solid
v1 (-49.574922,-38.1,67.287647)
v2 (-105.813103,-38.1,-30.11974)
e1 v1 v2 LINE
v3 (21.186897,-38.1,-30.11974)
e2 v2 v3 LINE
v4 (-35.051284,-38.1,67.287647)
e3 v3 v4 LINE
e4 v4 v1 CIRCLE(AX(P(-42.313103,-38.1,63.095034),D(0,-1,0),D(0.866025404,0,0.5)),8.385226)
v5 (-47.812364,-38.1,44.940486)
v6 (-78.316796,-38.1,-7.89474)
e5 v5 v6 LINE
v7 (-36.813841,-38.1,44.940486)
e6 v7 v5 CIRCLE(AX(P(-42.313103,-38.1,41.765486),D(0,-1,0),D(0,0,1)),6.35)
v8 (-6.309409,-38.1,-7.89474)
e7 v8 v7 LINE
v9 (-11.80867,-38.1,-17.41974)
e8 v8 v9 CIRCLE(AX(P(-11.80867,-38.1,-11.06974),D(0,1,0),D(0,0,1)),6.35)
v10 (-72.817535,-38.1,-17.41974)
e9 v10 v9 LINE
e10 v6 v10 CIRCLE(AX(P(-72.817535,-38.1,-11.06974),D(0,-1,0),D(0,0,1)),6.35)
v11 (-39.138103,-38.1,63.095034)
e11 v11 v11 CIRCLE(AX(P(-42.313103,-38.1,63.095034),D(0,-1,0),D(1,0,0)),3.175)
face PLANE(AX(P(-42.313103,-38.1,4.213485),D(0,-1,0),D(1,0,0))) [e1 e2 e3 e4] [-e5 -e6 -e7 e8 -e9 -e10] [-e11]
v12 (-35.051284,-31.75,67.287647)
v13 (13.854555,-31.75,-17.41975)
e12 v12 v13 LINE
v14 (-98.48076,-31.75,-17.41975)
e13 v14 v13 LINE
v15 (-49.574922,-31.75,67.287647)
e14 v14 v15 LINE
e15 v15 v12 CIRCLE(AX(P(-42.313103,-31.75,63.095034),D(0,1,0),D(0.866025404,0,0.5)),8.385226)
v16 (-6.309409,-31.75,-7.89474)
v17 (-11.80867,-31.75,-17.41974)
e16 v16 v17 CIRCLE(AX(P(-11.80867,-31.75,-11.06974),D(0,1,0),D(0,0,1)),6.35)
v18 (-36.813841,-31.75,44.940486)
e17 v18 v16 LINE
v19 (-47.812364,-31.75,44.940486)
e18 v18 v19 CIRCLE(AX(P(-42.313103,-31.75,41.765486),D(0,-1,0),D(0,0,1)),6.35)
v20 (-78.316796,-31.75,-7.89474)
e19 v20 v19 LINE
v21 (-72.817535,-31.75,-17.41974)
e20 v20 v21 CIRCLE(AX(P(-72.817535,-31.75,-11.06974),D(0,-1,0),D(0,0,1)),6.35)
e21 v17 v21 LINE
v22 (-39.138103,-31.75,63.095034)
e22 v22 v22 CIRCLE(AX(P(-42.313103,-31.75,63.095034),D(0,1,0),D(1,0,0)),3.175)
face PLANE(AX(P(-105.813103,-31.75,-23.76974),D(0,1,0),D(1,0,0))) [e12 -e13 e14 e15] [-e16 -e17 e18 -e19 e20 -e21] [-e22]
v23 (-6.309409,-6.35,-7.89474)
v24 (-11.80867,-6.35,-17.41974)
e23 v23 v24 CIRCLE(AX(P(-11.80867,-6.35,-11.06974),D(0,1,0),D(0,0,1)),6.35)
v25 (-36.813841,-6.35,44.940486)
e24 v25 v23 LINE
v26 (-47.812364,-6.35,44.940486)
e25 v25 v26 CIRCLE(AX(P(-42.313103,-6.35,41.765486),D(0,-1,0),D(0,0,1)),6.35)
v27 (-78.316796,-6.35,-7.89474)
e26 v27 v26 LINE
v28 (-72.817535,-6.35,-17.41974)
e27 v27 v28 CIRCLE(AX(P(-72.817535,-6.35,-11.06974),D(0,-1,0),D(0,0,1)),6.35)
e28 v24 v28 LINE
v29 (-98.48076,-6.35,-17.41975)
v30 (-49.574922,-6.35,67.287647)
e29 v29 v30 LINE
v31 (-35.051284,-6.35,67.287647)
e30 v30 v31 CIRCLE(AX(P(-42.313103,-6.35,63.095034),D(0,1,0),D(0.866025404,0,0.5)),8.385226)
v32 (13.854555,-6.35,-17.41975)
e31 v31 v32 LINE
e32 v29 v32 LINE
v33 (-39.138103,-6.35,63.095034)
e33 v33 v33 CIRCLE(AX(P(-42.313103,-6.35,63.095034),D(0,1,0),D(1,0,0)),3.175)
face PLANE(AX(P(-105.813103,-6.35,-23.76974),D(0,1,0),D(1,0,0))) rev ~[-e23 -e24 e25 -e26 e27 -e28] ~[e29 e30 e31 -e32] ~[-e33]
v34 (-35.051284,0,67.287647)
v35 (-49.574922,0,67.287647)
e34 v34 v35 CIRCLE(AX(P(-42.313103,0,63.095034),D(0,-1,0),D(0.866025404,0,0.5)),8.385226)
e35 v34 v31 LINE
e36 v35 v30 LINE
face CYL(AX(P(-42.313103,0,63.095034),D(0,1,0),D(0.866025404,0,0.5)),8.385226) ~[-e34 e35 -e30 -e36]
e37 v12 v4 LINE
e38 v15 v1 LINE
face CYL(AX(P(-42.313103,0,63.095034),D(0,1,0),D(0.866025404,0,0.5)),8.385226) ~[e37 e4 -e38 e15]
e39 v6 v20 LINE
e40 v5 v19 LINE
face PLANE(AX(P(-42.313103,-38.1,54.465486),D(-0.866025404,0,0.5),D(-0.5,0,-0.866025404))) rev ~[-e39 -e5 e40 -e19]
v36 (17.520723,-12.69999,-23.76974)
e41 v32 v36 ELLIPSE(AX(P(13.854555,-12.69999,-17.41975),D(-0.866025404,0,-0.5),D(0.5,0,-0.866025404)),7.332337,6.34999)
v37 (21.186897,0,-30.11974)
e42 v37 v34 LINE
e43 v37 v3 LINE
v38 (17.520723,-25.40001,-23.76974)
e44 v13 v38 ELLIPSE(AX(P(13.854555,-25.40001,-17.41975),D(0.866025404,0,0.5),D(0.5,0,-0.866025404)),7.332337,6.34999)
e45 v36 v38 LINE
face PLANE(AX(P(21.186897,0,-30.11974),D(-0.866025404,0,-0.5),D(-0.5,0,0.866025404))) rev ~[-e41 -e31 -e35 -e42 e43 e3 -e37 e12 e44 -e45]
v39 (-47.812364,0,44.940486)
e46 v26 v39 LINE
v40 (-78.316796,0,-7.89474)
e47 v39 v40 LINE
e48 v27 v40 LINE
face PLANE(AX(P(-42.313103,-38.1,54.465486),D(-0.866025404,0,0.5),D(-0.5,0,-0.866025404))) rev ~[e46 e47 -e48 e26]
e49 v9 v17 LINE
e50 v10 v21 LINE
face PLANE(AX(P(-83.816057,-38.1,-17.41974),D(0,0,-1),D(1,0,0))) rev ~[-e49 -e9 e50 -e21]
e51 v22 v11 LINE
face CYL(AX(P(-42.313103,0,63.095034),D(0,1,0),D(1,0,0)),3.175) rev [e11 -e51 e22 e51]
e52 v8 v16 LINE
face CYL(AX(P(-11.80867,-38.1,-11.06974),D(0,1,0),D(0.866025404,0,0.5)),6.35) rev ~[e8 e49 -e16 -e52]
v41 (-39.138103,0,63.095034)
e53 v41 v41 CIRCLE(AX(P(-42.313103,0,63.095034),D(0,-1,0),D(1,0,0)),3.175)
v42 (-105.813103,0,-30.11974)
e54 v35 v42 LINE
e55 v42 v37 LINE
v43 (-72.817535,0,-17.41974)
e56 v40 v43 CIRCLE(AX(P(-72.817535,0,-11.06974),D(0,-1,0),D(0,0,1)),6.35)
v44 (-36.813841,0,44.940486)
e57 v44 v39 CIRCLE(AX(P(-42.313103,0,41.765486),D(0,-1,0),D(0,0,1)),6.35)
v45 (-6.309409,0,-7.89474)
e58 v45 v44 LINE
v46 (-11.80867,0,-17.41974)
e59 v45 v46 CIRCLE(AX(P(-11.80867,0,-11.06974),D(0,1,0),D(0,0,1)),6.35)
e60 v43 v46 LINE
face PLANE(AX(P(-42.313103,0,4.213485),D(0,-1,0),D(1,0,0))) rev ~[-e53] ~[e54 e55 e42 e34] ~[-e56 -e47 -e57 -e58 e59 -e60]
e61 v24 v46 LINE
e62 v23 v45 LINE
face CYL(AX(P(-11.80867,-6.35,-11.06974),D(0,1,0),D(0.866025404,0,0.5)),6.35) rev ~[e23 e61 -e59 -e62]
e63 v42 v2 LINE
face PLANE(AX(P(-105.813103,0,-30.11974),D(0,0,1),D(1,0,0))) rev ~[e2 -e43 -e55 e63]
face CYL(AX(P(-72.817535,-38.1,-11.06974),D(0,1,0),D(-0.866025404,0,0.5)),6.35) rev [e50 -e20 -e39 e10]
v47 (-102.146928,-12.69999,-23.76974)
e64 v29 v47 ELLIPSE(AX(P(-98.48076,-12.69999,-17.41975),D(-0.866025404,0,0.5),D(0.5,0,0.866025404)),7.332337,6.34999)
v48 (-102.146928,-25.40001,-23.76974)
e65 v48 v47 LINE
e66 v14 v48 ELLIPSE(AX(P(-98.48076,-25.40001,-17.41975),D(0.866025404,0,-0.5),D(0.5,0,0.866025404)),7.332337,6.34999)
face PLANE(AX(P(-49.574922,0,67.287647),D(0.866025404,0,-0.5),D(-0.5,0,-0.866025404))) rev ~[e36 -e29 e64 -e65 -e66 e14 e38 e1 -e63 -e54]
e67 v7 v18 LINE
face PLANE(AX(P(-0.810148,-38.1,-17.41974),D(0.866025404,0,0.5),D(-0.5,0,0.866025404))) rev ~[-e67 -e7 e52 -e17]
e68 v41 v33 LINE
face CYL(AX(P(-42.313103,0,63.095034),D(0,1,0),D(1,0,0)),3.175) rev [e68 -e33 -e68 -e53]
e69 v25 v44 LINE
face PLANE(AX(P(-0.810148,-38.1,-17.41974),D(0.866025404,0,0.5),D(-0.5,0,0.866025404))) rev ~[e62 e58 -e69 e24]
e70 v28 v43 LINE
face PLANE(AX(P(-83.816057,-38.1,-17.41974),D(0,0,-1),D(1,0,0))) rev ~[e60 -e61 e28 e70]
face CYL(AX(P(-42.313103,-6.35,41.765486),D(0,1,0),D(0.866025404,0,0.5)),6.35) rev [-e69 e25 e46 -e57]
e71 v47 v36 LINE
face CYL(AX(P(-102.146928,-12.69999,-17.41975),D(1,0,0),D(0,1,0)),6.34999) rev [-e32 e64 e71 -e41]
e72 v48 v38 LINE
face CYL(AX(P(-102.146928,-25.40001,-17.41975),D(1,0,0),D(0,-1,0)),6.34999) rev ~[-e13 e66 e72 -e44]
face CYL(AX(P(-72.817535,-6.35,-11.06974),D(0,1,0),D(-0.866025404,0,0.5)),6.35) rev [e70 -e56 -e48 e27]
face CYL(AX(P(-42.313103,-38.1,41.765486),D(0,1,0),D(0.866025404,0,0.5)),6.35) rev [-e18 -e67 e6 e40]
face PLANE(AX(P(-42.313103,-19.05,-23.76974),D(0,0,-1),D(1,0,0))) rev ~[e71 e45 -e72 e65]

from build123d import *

# Parameters (mm, degrees)
F0_R     = 3.175
F1_DEPTH = 38.1
F3_W     = 127
F3_H     = 25.4
F4_DEPTH = 95.251
F6_DEPTH = 38.101
F7_R     = 6.35
F8_R     = 6.34999


# Not quite as in the source:
# - a fillet or chamfer is up to 0.001 mm smaller than in the source, because OpenCascade refuses the exact size


with BuildPart() as f1:
    # F0 (on Front) → F1 (new body)
    with BuildSketch(Plane.XZ):
        with BuildLine():
            Line((-49.5749215348, 67.2876468139), (-105.8131025593, -30.1197400458))
            Line((-105.8131025593, -30.1197400458), (21.1868974407, -30.1197400458))
            Line((21.1868974407, -30.1197400458), (-35.0512835838, 67.2876468139))
            ThreePointArc((-35.0512835838, 67.2876468139), (-42.3131025593, 71.4802599542), (-49.5749215348, 67.2876468139))
        make_face()
        with Locations((-42.3131025593, 63.0950336736)):
            Circle(F0_R, mode=Mode.SUBTRACT)
    extrude(amount=F1_DEPTH)

    # F3 (on offset) → F4 (cut, through all)
    with BuildSketch(Plane(origin=(0, 0, -23.7697400458), x_dir=(1, 0, 0), z_dir=(0, 0, -1))):
        with Locations((-42.3131025593, 19.05)):
            Rectangle(F3_W, F3_H)
    extrude(amount=-F4_DEPTH, mode=Mode.SUBTRACT)

    # F5 (on face) → F6 (cut, through all)
    with BuildSketch(Plane.XZ.offset(38.1)):
        Polygon((-0.8101478154, -17.4197400458), (-42.3131025593, 54.4654862348), (-83.8160573032, -17.4197400458), align=None)
    extrude(amount=-F6_DEPTH, mode=Mode.SUBTRACT)

    # F7
    f7_edges = [f1.edges().sort_by_distance(p)[0] for p in [
        (-42.313103, -34.925, 54.465486),
        (-83.816057, -34.925, -17.41974),
        (-0.810148, -34.925, -17.41974),
        (-0.810148, -3.175, -17.41974),
        (-83.816057, -3.175, -17.41974),
        (-42.313103, -3.175, 54.465486),
    ]]
    fillet(f7_edges, radius=F7_R)

    # F8 (radius 6.35 in the source; OpenCascade refuses exactly that, so slightly less here)
    f8_edges = [f1.edges().sort_by_distance(p)[0] for p in [
        (-42.313103, -6.35, -23.76974),
        (-42.313103, -31.75, -23.76974),
    ]]
    fillet(f8_edges, radius=F8_R)


solid = f1.part
